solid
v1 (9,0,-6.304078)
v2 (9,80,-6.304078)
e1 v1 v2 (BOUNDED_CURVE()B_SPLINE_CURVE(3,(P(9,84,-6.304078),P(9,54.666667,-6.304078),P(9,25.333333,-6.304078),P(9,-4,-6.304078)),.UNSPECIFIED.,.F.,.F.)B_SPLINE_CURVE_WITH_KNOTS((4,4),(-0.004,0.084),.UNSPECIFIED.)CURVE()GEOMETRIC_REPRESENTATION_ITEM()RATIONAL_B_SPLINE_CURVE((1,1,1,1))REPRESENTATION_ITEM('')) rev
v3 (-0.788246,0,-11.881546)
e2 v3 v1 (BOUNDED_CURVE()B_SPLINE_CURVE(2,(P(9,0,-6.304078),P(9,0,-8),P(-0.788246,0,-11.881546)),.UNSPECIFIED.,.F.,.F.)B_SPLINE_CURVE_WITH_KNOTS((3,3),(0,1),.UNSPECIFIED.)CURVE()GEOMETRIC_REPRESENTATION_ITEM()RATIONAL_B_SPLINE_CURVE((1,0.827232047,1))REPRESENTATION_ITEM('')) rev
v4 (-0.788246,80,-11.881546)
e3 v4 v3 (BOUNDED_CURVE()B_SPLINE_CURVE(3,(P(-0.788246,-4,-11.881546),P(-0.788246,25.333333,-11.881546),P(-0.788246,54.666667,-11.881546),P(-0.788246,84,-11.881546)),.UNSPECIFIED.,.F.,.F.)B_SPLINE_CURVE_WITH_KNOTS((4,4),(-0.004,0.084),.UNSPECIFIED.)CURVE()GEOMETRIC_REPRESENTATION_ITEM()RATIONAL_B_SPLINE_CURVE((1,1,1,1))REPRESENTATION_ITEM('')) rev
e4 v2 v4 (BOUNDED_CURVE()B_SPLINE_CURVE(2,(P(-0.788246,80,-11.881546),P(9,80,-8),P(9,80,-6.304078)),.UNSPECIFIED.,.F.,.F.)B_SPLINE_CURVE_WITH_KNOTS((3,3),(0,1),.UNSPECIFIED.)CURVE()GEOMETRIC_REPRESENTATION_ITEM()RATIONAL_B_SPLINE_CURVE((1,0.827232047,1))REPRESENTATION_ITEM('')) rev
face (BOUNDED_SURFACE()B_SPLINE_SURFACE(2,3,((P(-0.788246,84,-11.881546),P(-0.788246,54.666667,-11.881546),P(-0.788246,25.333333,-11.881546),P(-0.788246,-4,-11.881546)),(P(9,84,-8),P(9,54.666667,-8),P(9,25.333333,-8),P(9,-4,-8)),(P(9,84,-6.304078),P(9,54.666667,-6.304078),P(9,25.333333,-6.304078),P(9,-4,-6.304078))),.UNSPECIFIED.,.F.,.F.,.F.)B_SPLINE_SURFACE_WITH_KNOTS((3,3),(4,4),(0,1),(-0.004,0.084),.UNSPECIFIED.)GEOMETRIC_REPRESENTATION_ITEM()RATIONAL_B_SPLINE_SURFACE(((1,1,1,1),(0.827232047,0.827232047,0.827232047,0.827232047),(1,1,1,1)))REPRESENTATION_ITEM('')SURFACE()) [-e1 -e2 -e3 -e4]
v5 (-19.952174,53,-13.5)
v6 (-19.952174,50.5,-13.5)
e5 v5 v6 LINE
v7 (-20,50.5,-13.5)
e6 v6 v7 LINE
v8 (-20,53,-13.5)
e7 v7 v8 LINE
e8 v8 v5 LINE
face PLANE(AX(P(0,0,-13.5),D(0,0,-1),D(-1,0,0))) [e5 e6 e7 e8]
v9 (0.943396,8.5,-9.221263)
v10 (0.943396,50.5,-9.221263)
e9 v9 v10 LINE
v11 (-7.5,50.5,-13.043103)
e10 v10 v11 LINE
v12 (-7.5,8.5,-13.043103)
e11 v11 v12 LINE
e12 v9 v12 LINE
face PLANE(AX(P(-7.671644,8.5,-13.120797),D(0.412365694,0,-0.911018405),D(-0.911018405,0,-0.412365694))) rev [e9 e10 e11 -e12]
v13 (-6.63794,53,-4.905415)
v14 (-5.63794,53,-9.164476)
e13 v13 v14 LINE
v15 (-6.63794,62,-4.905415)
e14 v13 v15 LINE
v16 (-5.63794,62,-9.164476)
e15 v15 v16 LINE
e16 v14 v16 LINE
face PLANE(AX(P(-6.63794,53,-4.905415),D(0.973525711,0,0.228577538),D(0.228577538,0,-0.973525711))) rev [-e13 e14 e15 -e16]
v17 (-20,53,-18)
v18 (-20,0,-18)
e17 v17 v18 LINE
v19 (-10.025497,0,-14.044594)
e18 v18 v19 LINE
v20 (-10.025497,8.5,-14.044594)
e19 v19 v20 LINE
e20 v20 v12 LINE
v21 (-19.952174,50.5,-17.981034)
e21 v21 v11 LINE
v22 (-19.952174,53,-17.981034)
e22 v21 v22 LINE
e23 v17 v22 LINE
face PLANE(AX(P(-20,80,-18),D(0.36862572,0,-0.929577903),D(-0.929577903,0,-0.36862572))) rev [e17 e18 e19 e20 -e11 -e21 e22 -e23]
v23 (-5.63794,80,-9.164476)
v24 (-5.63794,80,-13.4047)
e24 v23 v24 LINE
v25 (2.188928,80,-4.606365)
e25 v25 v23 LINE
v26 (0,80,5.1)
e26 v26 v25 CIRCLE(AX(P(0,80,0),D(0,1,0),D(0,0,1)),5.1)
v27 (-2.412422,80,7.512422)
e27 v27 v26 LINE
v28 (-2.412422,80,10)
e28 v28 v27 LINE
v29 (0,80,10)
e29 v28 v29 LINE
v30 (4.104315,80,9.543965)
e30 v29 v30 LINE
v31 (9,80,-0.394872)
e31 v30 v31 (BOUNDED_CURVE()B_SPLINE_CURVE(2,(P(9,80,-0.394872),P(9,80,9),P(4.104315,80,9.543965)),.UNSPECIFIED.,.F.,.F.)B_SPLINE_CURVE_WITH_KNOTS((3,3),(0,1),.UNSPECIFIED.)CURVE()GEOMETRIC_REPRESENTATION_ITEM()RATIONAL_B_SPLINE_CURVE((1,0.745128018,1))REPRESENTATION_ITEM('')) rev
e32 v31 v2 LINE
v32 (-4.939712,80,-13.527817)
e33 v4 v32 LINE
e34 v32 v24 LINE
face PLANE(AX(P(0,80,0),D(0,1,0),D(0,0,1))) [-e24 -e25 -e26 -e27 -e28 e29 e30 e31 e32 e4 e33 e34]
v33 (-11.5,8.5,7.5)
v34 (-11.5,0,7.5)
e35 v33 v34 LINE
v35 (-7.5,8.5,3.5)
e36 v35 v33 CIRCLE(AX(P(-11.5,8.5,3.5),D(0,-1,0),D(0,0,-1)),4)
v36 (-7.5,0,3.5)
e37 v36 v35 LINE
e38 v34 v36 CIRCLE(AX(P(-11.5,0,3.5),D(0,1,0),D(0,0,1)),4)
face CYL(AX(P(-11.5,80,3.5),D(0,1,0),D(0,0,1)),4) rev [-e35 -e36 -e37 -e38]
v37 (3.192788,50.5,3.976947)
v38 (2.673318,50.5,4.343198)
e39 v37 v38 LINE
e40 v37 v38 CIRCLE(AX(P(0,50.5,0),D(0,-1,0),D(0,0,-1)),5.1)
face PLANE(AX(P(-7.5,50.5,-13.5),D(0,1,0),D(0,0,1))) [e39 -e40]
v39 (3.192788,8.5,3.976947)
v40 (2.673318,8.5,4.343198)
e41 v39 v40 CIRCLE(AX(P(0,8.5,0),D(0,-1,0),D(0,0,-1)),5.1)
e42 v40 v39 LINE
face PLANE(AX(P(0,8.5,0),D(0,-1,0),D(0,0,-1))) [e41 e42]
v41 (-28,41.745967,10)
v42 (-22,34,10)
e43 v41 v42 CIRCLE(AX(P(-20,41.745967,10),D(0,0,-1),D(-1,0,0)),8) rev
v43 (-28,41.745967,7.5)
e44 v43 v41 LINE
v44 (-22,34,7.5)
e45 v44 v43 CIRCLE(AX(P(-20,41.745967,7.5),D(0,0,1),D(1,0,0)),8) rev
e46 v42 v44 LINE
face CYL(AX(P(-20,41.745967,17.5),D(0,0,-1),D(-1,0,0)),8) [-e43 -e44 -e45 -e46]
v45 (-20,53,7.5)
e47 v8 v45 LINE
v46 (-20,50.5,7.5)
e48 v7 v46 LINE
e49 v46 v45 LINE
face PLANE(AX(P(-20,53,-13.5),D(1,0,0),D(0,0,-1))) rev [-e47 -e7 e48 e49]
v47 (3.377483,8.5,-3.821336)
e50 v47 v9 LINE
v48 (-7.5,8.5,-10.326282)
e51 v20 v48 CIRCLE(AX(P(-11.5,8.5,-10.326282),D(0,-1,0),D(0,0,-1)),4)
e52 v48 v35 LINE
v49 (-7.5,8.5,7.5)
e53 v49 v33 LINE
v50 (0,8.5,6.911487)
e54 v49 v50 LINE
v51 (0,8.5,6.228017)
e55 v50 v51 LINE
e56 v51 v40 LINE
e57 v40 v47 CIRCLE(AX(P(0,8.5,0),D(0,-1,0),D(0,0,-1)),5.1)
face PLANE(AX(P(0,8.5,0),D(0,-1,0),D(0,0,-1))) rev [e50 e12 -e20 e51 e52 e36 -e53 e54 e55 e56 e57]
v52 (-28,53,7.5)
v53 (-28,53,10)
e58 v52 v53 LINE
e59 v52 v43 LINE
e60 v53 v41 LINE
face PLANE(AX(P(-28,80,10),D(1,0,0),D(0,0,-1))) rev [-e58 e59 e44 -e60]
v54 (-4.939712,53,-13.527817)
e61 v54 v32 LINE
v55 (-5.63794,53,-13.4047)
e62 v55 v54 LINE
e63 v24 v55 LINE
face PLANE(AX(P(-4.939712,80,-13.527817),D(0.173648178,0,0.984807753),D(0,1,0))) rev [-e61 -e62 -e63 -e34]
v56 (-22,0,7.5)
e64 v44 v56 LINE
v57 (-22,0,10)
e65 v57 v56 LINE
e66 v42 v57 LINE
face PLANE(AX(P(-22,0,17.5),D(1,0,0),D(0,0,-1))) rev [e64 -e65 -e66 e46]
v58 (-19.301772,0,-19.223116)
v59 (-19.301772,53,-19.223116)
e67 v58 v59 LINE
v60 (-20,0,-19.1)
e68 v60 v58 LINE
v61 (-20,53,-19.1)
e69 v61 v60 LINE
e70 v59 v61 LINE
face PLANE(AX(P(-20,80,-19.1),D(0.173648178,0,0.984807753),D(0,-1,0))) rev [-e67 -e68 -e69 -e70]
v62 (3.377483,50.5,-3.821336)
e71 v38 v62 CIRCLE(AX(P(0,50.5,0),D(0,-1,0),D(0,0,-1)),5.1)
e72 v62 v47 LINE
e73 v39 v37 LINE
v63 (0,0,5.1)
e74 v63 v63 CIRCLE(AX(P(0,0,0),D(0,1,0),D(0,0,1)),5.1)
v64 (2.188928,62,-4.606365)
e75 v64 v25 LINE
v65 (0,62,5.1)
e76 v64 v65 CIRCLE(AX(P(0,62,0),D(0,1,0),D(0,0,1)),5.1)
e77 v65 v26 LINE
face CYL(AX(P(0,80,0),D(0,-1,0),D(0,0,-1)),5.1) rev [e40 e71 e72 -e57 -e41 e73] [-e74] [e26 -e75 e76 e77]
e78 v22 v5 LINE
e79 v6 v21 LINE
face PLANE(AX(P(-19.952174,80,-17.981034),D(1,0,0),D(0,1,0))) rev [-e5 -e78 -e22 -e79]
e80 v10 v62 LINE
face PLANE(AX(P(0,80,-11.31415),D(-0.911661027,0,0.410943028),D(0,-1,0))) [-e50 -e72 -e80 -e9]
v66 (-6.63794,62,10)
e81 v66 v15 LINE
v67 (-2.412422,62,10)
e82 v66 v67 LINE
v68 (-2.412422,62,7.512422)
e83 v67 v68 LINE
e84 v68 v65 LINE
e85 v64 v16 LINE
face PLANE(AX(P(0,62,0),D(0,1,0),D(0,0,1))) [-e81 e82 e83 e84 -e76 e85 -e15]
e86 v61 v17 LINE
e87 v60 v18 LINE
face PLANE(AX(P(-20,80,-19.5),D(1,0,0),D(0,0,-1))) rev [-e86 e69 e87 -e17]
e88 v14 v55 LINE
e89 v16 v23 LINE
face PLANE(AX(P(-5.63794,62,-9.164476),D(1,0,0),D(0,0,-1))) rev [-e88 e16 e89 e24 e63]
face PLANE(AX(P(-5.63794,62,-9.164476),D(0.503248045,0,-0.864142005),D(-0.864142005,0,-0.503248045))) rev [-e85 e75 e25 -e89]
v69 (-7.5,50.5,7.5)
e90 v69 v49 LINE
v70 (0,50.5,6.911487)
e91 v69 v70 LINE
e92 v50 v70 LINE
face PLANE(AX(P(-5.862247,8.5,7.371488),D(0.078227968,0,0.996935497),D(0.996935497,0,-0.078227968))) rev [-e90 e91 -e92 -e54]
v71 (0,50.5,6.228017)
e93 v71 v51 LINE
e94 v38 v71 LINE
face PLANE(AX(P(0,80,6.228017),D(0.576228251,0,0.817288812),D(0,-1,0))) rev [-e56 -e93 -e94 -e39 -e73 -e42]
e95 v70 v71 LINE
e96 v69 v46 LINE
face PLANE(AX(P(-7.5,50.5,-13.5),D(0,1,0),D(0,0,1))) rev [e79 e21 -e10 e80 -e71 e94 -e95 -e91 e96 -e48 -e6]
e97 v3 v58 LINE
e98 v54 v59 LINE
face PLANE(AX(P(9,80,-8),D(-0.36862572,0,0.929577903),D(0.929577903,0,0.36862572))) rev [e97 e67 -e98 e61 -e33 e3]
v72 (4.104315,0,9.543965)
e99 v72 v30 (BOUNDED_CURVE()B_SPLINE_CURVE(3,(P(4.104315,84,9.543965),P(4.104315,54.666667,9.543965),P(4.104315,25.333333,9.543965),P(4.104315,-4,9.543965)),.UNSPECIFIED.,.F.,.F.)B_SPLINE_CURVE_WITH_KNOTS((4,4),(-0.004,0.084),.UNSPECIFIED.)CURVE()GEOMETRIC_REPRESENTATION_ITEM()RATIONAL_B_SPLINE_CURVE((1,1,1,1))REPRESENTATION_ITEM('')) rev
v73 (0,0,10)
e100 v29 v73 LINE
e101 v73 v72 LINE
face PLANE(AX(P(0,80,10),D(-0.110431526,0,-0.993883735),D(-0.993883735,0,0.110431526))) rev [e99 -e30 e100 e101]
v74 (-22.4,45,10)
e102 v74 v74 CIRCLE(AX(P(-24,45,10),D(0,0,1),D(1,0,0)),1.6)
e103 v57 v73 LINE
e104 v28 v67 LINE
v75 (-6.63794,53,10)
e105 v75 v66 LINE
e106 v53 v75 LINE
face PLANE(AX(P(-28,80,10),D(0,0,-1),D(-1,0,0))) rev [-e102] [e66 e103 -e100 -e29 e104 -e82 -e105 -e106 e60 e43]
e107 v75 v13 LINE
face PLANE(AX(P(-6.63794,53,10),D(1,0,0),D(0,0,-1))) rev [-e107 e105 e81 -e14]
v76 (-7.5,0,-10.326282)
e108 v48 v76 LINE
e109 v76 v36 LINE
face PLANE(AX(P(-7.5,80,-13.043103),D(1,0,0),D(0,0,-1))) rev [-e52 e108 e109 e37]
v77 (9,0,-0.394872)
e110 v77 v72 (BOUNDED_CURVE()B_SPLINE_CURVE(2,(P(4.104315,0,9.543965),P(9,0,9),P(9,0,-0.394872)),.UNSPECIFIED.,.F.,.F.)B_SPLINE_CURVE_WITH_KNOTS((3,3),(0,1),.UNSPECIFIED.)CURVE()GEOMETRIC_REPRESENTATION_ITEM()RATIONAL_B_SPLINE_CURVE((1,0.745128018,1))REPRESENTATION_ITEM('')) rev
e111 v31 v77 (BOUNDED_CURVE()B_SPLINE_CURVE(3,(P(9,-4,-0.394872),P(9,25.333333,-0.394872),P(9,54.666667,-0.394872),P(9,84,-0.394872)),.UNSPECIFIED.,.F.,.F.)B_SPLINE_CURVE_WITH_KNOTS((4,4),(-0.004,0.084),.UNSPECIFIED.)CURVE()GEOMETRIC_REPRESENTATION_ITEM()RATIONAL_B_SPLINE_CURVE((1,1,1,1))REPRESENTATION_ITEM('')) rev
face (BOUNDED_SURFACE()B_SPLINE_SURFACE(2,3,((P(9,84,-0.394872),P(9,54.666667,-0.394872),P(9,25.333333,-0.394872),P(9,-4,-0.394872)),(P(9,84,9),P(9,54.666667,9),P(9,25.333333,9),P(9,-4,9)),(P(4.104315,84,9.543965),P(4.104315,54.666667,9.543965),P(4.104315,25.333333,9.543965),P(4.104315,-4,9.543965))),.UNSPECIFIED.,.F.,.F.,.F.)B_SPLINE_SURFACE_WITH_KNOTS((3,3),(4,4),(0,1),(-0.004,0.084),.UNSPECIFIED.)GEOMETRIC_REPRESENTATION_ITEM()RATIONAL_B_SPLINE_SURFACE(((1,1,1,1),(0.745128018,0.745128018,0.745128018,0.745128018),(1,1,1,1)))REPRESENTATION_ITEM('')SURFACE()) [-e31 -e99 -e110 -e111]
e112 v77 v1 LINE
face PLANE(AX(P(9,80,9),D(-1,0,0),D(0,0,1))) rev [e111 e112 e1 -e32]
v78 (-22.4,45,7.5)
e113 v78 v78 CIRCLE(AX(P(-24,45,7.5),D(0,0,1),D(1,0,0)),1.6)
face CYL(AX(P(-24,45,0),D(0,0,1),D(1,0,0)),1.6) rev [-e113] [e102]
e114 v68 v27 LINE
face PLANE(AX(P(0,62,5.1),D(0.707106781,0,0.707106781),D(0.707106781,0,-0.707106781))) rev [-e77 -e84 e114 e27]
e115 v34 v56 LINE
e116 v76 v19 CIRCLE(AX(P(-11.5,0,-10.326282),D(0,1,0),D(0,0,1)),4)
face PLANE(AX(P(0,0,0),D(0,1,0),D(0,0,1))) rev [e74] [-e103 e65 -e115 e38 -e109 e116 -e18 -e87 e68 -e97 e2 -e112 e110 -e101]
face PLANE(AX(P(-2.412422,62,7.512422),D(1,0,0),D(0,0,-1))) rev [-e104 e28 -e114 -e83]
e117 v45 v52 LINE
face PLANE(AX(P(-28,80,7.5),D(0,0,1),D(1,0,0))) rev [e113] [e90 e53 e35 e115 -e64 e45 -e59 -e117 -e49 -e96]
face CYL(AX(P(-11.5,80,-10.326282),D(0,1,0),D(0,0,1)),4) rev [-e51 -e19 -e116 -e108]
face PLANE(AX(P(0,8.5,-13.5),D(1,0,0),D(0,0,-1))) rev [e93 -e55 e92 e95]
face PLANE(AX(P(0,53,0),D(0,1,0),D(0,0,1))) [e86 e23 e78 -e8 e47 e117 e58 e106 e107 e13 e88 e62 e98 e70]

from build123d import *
from OCP.BRepFilletAPI import BRepFilletAPI_MakeChamfer

# Parameters (mm, degrees)
SKETCH1_R           = 5.1
BOSS_EXTRUDE1_DEPTH = 80
CUT_EXTRUDE2_START  = -18
CUT_EXTRUDE2_DEPTH  = 18
CUT_EXTRUDE3_DEPTH  = 9
SKETCH8_R           = 1.6
CUT_EXTRUDE5_DEPTH  = 10
SKETCH10_W          = 12.5
SKETCH10_H          = 2.5
BOSS_EXTRUDE3_DEPTH = 21
CHAMFER1_SIZE       = 11.3
CHAMFER1_SIZE2      = 12.156054871
CHAMFER2_SIZE       = 0.4
CHAMFER2_SIZE2      = 0.751123796
SKETCH11_W          = 6
SKETCH11_H          = 34
CUT_EXTRUDE6_DEPTH  = 10
FILLET3_R           = 8
CUT_EXTRUDE7_START  = -50.5
CUT_EXTRUDE7_DEPTH  = 42
CHAMFER4_START      = 8.5
CHAMFER4_DEPTH      = 42
CHAMFER4_2_DEPTH    = 42
FILLET4_R           = 4


with BuildPart() as part:
    # Sketch1 → Boss-Extrude1 (new body)
    with BuildSketch(Plane(origin=(0, 0, 0), x_dir=(1, 0, 0), z_dir=(0, 1, 0))):
        Polygon((0, -10), (9, -9), (9, 8), (-20, 19.5), (-20, 18), (-7.5, 13.043103448), (-7.5, -7.5), (-28, -7.5), (-28, -10), align=None)
        with Locations(Location((0, 0, 0), (0, 0, 270))):
            Circle(SKETCH1_R, mode=Mode.SUBTRACT)
    extrude(amount=BOSS_EXTRUDE1_DEPTH)

    # Fillet1
    # a fillet whose section is not a circle: 10, 6 mm, written as the material it takes off along each edge
    with BuildSketch(Plane(origin=(9, -23.487180939, 9), x_dir=(-0.993883734673619, 0, 0.11043152607484658), z_dir=(0, 1, 0))) as fillet1_piece_1:
        with BuildLine():
            Bezier((4.925812314, 0), (0, 0), (-1.037490094, -9.337410844), weights=[1, 0.745128018, 1])
            Line((-1.037490094, -9.337410844), (0, 0))
            Line((0, 0), (4.925812314, 0))
        make_face()
    extrude(amount=126.974361879, mode=Mode.SUBTRACT)

    # Fillet2
    # a fillet whose section is not a circle: 12, 6 mm, written as the material it takes off along each edge
    with BuildSketch(Plane(origin=(9, -26.324436186, -8), x_dir=(-0.9295779033226579, 0, -0.368625720283123), z_dir=(0, 1, 0))) as fillet2_piece_1:
        with BuildLine():
            Bezier((10.529774474, 0), (0, 0), (-0.625160366, 1.576491357), weights=[1, 0.827232047, 1])
            Line((-0.625160366, 1.576491357), (0, 0))
            Line((0, 0), (10.529774474, 0))
        make_face()
    extrude(amount=132.648872372, mode=Mode.SUBTRACT)

    # Sketch5 → Cut-Extrude2 (cut)
    with BuildSketch(Plane(origin=(0, 80, 0), x_dir=(1, 0, 0), z_dir=(0, 1, 0)).offset(CUT_EXTRUDE2_START)):
        with BuildLine():
            Line((-40.382705662, 23.287650548), (-40.382705662, -15.07166092))
            Line((-40.382705662, -15.07166092), (-2.412422064, -15.07166092))
            Line((-2.412422064, -15.07166092), (-2.412422064, -7.512422064))
            Line((-2.412422064, -7.512422064), (0, -5.1))
            ThreePointArc((0, -5.1), (4.863777761, -1.534166188), (2.926213093, 4.176993768))
            Line((2.926213093, 4.176993768), (-5.637939913, 9.164476421))
            Line((-5.637939913, 9.164476421), (-5.637939913, 23.287650548))
            Line((-5.637939913, 23.287650548), (-40.382705662, 23.287650548))
        make_face()
    extrude(amount=CUT_EXTRUDE2_DEPTH, mode=Mode.SUBTRACT)

    # Sketch6 → Cut-Extrude3 (cut)
    with BuildSketch(Plane(origin=(0, 62, 0), x_dir=(1, 0, 0), z_dir=(0, 1, 0))):
        Polygon((-6.637939913, -10), (-28, -10), (-28, 21.40414119), (-6.637939913, 21.40414119), (-5.637939913, 21.40414119), (-5.637939913, 9.164476421), (-6.637939913, 4.905415269), align=None)
    extrude(amount=-CUT_EXTRUDE3_DEPTH, mode=Mode.SUBTRACT)

    # Sketch8 → Cut-Extrude5 (cut)
    with BuildSketch(Plane.XY.offset(10)):
        with Locations((-24, 45)):
            Circle(SKETCH8_R)
    extrude(amount=-CUT_EXTRUDE5_DEPTH, mode=Mode.SUBTRACT)

    # Sketch10 → Boss-Extrude3 (add)
    with BuildSketch(Plane(origin=(0, 0, 7.5), x_dir=(-1, 0, 0), z_dir=(0, 0, -1))):
        with Locations((13.75, 51.75)):
            Rectangle(SKETCH10_W, SKETCH10_H)
    extrude(amount=BOSS_EXTRUDE3_DEPTH)

    # Chamfer1
    chamfer1_edges = [part.edges().sort_by_distance(p)[0] for p in [
        (-8.652173913, 51.75, -13.5),
    ]]
    chamfer1_side = [part.faces().sort_by_distance(p)[0] for p in [
        (-14.326086957, 51.75, -13.5),
    ]]
    chamfer(chamfer1_edges, length=CHAMFER1_SIZE, length2=CHAMFER1_SIZE2, reference=chamfer1_side[0])

    # Chamfer2: one chamfer whose edges measure the first distance from different faces: ONE call of the kernel's chamfer builder (chamfer() names one face for all edges)
    chamfer2_edges_1 = [part.edges().sort_by_distance(p)[0] for p in [
        (-5.637939913, 66.5, -13.80470031),
    ]]
    chamfer2_side_1 = [part.faces().sort_by_distance(p)[0] for p in [
        (-5.637939913, 66.5, -11.484588366),
    ]]
    chamfer2_edges_2 = [part.edges().sort_by_distance(p)[0] for p in [
        (-20, 26.5, -19.5),
    ]]
    chamfer2_side_2 = [part.faces().sort_by_distance(p)[0] for p in [
        (-20, 26.5, -18.75),
    ]]
    chamfer2 = BRepFilletAPI_MakeChamfer(part.part.solid().wrapped)
    for e in chamfer2_edges_1:
        chamfer2.Add(CHAMFER2_SIZE, CHAMFER2_SIZE2, e.wrapped, chamfer2_side_1[0].wrapped)  # the first distance lies on this face
    for e in chamfer2_edges_2:
        chamfer2.Add(CHAMFER2_SIZE, CHAMFER2_SIZE2, e.wrapped, chamfer2_side_2[0].wrapped)  # the first distance lies on this face
    add(Compound.cast(chamfer2.Shape()), mode=Mode.REPLACE)

    # Sketch11 → Cut-Extrude6 (cut)
    with BuildSketch(Plane(origin=(0, 0, 7.5), x_dir=(-1, 0, 0), z_dir=(0, 0, -1))):
        with Locations((25, 17)):
            Rectangle(SKETCH11_W, SKETCH11_H)
    extrude(amount=-CUT_EXTRUDE6_DEPTH, mode=Mode.SUBTRACT)

    # Fillet3
    # the kernel refuses this fillet: 8 mm, written as the material it takes off along each edge
    with BuildSketch(Plane(origin=(-28, 34, -11.864916731), x_dir=(0, 1, 0), z_dir=(0, 0, 1))) as fillet3_piece_1:
        with BuildLine():
            CenterArc((7.745966692, -8), FILLET3_R, 90, 75.522487814)
            Line((0, -6), (-0.154919334, -5.96))
            ThreePointArc((-0.154919334, -5.96), (-0.16, -3), (-0.16, 0))
            Line((-0.16, 0), (0, 0.16))
            Line((0, 0.16), (7.745966692, 0.16))
            Line((7.745966692, 0.16), (7.745966692, 0))
        make_face()
    extrude(amount=41.229833462, mode=Mode.SUBTRACT)

    # Sketch12 → Cut-Extrude7 (cut)
    with BuildSketch(Plane.XZ.offset(CUT_EXTRUDE7_START)):
        Polygon((-7.5, -13.043103448), (0, -9.648284322), (0, 6.91148674), (-7.5, 7.5), align=None)
    extrude(amount=CUT_EXTRUDE7_DEPTH, mode=Mode.SUBTRACT)

    # Chamfer3
    # the kernel refuses this chamfer: 10 mm, written as the material it takes off along each edge
    with BuildSketch(Plane(origin=(0, 50.5, -5.1), x_dir=(0.9352222959192602, 0, 0.3540610924904171), z_dir=(0, -1, 0))) as chamfer3_piece_1_section:
        with BuildLine():
            Line((3.894265856, 0.282842712), (-2.483031603, -6.094454747))
            Line((-2.483031603, -6.094454747), (-2.670076063, -6.023642528))
            ThreePointArc((-2.670076063, -6.023642528), (-1.351695644, -3.005514942), (-0.187044459, 0.070812218))
            Line((-0.187044459, 0.070812218), (0.070812218, 0.187044459))
            ThreePointArc((0.070812218, 0.187044459), (1.955367921, -0.128080347), (3.823453637, 0.469887172))
            Line((3.823453637, 0.469887172), (3.894265856, 0.282842712))
        make_face()
    chamfer3_piece_1 = extrude(amount=42, mode=Mode.PRIVATE)
    chamfer3_piece_1 = split(chamfer3_piece_1, bisect_by=Plane(origin=(1.70866642, 50.5, -8.874869196), z_dir=(-0.4123656941532171, 0, 0.9110184050201925)), keep=Keep.TOP, mode=Mode.PRIVATE)
    add(chamfer3_piece_1, mode=Mode.SUBTRACT)

    # Chamfer4: read off the stored shape, not the designer's step
    # Chamfer4 outline → Chamfer4 (cut)
    with BuildSketch(Plane(origin=(0, 0, 0), x_dir=(1, 0, 0), z_dir=(0, 1, 0)).offset(CHAMFER4_START)):
        with BuildLine():
            Line((0, -5.1), (0, -6.228017105))
            Line((0, -6.228017105), (2.673318305, -4.343198043))
            ThreePointArc((2.673318305, -4.343198043), (1.389188609, -4.907153453), (0, -5.1))
        make_face()
    extrude(amount=CHAMFER4_DEPTH, mode=Mode.SUBTRACT)

    # Chamfer4 2 outline → Chamfer4 2 (add)
    with BuildSketch(Plane(origin=(0, 0, 0), x_dir=(1, 0, 0), z_dir=(0, 1, 0)).offset(CHAMFER4_START)):
        with BuildLine():
            Line((3.192787517, -3.976947054), (2.673318305, -4.343198043))
            ThreePointArc((2.673318305, -4.343198043), (2.938764081, -4.168172942), (3.192787517, -3.976947054))
        make_face()
    extrude(amount=CHAMFER4_2_DEPTH)

    # Fillet4
    # the kernel refuses this fillet: 4 mm, written as the material it adds along each edge
    with BuildSketch(Plane(origin=(-7.5, 0, 7.5), x_dir=(-1, 0, 0), z_dir=(0, 1, 0))) as fillet4_piece_1:
        with BuildLine():
            CenterArc((FILLET4_R, -FILLET4_R), FILLET4_R, 90, 90)
            Line((0, -FILLET4_R), (0, 0))
            Line((0, 0), (FILLET4_R, 0))
        make_face()
    extrude(amount=8.5)
    with BuildSketch(Plane(origin=(-7.5, 0, -13.043103448), x_dir=(-0.9295779033226581, 0, -0.3686257202831227), z_dir=(0, 1, 0))) as fillet4_piece_2:
        with BuildLine():
            CenterArc((FILLET4_R * 0.679205344125, FILLET4_R), FILLET4_R, 201.630886837, 68.369113163)
            Line((-FILLET4_R * 0.250372559198, FILLET4_R * 0.631374279717), (0, 0))
            Line((0, 0), (FILLET4_R * 0.679205344125, 0))
        make_face()
    extrude(amount=8.5)


solid = part.part
